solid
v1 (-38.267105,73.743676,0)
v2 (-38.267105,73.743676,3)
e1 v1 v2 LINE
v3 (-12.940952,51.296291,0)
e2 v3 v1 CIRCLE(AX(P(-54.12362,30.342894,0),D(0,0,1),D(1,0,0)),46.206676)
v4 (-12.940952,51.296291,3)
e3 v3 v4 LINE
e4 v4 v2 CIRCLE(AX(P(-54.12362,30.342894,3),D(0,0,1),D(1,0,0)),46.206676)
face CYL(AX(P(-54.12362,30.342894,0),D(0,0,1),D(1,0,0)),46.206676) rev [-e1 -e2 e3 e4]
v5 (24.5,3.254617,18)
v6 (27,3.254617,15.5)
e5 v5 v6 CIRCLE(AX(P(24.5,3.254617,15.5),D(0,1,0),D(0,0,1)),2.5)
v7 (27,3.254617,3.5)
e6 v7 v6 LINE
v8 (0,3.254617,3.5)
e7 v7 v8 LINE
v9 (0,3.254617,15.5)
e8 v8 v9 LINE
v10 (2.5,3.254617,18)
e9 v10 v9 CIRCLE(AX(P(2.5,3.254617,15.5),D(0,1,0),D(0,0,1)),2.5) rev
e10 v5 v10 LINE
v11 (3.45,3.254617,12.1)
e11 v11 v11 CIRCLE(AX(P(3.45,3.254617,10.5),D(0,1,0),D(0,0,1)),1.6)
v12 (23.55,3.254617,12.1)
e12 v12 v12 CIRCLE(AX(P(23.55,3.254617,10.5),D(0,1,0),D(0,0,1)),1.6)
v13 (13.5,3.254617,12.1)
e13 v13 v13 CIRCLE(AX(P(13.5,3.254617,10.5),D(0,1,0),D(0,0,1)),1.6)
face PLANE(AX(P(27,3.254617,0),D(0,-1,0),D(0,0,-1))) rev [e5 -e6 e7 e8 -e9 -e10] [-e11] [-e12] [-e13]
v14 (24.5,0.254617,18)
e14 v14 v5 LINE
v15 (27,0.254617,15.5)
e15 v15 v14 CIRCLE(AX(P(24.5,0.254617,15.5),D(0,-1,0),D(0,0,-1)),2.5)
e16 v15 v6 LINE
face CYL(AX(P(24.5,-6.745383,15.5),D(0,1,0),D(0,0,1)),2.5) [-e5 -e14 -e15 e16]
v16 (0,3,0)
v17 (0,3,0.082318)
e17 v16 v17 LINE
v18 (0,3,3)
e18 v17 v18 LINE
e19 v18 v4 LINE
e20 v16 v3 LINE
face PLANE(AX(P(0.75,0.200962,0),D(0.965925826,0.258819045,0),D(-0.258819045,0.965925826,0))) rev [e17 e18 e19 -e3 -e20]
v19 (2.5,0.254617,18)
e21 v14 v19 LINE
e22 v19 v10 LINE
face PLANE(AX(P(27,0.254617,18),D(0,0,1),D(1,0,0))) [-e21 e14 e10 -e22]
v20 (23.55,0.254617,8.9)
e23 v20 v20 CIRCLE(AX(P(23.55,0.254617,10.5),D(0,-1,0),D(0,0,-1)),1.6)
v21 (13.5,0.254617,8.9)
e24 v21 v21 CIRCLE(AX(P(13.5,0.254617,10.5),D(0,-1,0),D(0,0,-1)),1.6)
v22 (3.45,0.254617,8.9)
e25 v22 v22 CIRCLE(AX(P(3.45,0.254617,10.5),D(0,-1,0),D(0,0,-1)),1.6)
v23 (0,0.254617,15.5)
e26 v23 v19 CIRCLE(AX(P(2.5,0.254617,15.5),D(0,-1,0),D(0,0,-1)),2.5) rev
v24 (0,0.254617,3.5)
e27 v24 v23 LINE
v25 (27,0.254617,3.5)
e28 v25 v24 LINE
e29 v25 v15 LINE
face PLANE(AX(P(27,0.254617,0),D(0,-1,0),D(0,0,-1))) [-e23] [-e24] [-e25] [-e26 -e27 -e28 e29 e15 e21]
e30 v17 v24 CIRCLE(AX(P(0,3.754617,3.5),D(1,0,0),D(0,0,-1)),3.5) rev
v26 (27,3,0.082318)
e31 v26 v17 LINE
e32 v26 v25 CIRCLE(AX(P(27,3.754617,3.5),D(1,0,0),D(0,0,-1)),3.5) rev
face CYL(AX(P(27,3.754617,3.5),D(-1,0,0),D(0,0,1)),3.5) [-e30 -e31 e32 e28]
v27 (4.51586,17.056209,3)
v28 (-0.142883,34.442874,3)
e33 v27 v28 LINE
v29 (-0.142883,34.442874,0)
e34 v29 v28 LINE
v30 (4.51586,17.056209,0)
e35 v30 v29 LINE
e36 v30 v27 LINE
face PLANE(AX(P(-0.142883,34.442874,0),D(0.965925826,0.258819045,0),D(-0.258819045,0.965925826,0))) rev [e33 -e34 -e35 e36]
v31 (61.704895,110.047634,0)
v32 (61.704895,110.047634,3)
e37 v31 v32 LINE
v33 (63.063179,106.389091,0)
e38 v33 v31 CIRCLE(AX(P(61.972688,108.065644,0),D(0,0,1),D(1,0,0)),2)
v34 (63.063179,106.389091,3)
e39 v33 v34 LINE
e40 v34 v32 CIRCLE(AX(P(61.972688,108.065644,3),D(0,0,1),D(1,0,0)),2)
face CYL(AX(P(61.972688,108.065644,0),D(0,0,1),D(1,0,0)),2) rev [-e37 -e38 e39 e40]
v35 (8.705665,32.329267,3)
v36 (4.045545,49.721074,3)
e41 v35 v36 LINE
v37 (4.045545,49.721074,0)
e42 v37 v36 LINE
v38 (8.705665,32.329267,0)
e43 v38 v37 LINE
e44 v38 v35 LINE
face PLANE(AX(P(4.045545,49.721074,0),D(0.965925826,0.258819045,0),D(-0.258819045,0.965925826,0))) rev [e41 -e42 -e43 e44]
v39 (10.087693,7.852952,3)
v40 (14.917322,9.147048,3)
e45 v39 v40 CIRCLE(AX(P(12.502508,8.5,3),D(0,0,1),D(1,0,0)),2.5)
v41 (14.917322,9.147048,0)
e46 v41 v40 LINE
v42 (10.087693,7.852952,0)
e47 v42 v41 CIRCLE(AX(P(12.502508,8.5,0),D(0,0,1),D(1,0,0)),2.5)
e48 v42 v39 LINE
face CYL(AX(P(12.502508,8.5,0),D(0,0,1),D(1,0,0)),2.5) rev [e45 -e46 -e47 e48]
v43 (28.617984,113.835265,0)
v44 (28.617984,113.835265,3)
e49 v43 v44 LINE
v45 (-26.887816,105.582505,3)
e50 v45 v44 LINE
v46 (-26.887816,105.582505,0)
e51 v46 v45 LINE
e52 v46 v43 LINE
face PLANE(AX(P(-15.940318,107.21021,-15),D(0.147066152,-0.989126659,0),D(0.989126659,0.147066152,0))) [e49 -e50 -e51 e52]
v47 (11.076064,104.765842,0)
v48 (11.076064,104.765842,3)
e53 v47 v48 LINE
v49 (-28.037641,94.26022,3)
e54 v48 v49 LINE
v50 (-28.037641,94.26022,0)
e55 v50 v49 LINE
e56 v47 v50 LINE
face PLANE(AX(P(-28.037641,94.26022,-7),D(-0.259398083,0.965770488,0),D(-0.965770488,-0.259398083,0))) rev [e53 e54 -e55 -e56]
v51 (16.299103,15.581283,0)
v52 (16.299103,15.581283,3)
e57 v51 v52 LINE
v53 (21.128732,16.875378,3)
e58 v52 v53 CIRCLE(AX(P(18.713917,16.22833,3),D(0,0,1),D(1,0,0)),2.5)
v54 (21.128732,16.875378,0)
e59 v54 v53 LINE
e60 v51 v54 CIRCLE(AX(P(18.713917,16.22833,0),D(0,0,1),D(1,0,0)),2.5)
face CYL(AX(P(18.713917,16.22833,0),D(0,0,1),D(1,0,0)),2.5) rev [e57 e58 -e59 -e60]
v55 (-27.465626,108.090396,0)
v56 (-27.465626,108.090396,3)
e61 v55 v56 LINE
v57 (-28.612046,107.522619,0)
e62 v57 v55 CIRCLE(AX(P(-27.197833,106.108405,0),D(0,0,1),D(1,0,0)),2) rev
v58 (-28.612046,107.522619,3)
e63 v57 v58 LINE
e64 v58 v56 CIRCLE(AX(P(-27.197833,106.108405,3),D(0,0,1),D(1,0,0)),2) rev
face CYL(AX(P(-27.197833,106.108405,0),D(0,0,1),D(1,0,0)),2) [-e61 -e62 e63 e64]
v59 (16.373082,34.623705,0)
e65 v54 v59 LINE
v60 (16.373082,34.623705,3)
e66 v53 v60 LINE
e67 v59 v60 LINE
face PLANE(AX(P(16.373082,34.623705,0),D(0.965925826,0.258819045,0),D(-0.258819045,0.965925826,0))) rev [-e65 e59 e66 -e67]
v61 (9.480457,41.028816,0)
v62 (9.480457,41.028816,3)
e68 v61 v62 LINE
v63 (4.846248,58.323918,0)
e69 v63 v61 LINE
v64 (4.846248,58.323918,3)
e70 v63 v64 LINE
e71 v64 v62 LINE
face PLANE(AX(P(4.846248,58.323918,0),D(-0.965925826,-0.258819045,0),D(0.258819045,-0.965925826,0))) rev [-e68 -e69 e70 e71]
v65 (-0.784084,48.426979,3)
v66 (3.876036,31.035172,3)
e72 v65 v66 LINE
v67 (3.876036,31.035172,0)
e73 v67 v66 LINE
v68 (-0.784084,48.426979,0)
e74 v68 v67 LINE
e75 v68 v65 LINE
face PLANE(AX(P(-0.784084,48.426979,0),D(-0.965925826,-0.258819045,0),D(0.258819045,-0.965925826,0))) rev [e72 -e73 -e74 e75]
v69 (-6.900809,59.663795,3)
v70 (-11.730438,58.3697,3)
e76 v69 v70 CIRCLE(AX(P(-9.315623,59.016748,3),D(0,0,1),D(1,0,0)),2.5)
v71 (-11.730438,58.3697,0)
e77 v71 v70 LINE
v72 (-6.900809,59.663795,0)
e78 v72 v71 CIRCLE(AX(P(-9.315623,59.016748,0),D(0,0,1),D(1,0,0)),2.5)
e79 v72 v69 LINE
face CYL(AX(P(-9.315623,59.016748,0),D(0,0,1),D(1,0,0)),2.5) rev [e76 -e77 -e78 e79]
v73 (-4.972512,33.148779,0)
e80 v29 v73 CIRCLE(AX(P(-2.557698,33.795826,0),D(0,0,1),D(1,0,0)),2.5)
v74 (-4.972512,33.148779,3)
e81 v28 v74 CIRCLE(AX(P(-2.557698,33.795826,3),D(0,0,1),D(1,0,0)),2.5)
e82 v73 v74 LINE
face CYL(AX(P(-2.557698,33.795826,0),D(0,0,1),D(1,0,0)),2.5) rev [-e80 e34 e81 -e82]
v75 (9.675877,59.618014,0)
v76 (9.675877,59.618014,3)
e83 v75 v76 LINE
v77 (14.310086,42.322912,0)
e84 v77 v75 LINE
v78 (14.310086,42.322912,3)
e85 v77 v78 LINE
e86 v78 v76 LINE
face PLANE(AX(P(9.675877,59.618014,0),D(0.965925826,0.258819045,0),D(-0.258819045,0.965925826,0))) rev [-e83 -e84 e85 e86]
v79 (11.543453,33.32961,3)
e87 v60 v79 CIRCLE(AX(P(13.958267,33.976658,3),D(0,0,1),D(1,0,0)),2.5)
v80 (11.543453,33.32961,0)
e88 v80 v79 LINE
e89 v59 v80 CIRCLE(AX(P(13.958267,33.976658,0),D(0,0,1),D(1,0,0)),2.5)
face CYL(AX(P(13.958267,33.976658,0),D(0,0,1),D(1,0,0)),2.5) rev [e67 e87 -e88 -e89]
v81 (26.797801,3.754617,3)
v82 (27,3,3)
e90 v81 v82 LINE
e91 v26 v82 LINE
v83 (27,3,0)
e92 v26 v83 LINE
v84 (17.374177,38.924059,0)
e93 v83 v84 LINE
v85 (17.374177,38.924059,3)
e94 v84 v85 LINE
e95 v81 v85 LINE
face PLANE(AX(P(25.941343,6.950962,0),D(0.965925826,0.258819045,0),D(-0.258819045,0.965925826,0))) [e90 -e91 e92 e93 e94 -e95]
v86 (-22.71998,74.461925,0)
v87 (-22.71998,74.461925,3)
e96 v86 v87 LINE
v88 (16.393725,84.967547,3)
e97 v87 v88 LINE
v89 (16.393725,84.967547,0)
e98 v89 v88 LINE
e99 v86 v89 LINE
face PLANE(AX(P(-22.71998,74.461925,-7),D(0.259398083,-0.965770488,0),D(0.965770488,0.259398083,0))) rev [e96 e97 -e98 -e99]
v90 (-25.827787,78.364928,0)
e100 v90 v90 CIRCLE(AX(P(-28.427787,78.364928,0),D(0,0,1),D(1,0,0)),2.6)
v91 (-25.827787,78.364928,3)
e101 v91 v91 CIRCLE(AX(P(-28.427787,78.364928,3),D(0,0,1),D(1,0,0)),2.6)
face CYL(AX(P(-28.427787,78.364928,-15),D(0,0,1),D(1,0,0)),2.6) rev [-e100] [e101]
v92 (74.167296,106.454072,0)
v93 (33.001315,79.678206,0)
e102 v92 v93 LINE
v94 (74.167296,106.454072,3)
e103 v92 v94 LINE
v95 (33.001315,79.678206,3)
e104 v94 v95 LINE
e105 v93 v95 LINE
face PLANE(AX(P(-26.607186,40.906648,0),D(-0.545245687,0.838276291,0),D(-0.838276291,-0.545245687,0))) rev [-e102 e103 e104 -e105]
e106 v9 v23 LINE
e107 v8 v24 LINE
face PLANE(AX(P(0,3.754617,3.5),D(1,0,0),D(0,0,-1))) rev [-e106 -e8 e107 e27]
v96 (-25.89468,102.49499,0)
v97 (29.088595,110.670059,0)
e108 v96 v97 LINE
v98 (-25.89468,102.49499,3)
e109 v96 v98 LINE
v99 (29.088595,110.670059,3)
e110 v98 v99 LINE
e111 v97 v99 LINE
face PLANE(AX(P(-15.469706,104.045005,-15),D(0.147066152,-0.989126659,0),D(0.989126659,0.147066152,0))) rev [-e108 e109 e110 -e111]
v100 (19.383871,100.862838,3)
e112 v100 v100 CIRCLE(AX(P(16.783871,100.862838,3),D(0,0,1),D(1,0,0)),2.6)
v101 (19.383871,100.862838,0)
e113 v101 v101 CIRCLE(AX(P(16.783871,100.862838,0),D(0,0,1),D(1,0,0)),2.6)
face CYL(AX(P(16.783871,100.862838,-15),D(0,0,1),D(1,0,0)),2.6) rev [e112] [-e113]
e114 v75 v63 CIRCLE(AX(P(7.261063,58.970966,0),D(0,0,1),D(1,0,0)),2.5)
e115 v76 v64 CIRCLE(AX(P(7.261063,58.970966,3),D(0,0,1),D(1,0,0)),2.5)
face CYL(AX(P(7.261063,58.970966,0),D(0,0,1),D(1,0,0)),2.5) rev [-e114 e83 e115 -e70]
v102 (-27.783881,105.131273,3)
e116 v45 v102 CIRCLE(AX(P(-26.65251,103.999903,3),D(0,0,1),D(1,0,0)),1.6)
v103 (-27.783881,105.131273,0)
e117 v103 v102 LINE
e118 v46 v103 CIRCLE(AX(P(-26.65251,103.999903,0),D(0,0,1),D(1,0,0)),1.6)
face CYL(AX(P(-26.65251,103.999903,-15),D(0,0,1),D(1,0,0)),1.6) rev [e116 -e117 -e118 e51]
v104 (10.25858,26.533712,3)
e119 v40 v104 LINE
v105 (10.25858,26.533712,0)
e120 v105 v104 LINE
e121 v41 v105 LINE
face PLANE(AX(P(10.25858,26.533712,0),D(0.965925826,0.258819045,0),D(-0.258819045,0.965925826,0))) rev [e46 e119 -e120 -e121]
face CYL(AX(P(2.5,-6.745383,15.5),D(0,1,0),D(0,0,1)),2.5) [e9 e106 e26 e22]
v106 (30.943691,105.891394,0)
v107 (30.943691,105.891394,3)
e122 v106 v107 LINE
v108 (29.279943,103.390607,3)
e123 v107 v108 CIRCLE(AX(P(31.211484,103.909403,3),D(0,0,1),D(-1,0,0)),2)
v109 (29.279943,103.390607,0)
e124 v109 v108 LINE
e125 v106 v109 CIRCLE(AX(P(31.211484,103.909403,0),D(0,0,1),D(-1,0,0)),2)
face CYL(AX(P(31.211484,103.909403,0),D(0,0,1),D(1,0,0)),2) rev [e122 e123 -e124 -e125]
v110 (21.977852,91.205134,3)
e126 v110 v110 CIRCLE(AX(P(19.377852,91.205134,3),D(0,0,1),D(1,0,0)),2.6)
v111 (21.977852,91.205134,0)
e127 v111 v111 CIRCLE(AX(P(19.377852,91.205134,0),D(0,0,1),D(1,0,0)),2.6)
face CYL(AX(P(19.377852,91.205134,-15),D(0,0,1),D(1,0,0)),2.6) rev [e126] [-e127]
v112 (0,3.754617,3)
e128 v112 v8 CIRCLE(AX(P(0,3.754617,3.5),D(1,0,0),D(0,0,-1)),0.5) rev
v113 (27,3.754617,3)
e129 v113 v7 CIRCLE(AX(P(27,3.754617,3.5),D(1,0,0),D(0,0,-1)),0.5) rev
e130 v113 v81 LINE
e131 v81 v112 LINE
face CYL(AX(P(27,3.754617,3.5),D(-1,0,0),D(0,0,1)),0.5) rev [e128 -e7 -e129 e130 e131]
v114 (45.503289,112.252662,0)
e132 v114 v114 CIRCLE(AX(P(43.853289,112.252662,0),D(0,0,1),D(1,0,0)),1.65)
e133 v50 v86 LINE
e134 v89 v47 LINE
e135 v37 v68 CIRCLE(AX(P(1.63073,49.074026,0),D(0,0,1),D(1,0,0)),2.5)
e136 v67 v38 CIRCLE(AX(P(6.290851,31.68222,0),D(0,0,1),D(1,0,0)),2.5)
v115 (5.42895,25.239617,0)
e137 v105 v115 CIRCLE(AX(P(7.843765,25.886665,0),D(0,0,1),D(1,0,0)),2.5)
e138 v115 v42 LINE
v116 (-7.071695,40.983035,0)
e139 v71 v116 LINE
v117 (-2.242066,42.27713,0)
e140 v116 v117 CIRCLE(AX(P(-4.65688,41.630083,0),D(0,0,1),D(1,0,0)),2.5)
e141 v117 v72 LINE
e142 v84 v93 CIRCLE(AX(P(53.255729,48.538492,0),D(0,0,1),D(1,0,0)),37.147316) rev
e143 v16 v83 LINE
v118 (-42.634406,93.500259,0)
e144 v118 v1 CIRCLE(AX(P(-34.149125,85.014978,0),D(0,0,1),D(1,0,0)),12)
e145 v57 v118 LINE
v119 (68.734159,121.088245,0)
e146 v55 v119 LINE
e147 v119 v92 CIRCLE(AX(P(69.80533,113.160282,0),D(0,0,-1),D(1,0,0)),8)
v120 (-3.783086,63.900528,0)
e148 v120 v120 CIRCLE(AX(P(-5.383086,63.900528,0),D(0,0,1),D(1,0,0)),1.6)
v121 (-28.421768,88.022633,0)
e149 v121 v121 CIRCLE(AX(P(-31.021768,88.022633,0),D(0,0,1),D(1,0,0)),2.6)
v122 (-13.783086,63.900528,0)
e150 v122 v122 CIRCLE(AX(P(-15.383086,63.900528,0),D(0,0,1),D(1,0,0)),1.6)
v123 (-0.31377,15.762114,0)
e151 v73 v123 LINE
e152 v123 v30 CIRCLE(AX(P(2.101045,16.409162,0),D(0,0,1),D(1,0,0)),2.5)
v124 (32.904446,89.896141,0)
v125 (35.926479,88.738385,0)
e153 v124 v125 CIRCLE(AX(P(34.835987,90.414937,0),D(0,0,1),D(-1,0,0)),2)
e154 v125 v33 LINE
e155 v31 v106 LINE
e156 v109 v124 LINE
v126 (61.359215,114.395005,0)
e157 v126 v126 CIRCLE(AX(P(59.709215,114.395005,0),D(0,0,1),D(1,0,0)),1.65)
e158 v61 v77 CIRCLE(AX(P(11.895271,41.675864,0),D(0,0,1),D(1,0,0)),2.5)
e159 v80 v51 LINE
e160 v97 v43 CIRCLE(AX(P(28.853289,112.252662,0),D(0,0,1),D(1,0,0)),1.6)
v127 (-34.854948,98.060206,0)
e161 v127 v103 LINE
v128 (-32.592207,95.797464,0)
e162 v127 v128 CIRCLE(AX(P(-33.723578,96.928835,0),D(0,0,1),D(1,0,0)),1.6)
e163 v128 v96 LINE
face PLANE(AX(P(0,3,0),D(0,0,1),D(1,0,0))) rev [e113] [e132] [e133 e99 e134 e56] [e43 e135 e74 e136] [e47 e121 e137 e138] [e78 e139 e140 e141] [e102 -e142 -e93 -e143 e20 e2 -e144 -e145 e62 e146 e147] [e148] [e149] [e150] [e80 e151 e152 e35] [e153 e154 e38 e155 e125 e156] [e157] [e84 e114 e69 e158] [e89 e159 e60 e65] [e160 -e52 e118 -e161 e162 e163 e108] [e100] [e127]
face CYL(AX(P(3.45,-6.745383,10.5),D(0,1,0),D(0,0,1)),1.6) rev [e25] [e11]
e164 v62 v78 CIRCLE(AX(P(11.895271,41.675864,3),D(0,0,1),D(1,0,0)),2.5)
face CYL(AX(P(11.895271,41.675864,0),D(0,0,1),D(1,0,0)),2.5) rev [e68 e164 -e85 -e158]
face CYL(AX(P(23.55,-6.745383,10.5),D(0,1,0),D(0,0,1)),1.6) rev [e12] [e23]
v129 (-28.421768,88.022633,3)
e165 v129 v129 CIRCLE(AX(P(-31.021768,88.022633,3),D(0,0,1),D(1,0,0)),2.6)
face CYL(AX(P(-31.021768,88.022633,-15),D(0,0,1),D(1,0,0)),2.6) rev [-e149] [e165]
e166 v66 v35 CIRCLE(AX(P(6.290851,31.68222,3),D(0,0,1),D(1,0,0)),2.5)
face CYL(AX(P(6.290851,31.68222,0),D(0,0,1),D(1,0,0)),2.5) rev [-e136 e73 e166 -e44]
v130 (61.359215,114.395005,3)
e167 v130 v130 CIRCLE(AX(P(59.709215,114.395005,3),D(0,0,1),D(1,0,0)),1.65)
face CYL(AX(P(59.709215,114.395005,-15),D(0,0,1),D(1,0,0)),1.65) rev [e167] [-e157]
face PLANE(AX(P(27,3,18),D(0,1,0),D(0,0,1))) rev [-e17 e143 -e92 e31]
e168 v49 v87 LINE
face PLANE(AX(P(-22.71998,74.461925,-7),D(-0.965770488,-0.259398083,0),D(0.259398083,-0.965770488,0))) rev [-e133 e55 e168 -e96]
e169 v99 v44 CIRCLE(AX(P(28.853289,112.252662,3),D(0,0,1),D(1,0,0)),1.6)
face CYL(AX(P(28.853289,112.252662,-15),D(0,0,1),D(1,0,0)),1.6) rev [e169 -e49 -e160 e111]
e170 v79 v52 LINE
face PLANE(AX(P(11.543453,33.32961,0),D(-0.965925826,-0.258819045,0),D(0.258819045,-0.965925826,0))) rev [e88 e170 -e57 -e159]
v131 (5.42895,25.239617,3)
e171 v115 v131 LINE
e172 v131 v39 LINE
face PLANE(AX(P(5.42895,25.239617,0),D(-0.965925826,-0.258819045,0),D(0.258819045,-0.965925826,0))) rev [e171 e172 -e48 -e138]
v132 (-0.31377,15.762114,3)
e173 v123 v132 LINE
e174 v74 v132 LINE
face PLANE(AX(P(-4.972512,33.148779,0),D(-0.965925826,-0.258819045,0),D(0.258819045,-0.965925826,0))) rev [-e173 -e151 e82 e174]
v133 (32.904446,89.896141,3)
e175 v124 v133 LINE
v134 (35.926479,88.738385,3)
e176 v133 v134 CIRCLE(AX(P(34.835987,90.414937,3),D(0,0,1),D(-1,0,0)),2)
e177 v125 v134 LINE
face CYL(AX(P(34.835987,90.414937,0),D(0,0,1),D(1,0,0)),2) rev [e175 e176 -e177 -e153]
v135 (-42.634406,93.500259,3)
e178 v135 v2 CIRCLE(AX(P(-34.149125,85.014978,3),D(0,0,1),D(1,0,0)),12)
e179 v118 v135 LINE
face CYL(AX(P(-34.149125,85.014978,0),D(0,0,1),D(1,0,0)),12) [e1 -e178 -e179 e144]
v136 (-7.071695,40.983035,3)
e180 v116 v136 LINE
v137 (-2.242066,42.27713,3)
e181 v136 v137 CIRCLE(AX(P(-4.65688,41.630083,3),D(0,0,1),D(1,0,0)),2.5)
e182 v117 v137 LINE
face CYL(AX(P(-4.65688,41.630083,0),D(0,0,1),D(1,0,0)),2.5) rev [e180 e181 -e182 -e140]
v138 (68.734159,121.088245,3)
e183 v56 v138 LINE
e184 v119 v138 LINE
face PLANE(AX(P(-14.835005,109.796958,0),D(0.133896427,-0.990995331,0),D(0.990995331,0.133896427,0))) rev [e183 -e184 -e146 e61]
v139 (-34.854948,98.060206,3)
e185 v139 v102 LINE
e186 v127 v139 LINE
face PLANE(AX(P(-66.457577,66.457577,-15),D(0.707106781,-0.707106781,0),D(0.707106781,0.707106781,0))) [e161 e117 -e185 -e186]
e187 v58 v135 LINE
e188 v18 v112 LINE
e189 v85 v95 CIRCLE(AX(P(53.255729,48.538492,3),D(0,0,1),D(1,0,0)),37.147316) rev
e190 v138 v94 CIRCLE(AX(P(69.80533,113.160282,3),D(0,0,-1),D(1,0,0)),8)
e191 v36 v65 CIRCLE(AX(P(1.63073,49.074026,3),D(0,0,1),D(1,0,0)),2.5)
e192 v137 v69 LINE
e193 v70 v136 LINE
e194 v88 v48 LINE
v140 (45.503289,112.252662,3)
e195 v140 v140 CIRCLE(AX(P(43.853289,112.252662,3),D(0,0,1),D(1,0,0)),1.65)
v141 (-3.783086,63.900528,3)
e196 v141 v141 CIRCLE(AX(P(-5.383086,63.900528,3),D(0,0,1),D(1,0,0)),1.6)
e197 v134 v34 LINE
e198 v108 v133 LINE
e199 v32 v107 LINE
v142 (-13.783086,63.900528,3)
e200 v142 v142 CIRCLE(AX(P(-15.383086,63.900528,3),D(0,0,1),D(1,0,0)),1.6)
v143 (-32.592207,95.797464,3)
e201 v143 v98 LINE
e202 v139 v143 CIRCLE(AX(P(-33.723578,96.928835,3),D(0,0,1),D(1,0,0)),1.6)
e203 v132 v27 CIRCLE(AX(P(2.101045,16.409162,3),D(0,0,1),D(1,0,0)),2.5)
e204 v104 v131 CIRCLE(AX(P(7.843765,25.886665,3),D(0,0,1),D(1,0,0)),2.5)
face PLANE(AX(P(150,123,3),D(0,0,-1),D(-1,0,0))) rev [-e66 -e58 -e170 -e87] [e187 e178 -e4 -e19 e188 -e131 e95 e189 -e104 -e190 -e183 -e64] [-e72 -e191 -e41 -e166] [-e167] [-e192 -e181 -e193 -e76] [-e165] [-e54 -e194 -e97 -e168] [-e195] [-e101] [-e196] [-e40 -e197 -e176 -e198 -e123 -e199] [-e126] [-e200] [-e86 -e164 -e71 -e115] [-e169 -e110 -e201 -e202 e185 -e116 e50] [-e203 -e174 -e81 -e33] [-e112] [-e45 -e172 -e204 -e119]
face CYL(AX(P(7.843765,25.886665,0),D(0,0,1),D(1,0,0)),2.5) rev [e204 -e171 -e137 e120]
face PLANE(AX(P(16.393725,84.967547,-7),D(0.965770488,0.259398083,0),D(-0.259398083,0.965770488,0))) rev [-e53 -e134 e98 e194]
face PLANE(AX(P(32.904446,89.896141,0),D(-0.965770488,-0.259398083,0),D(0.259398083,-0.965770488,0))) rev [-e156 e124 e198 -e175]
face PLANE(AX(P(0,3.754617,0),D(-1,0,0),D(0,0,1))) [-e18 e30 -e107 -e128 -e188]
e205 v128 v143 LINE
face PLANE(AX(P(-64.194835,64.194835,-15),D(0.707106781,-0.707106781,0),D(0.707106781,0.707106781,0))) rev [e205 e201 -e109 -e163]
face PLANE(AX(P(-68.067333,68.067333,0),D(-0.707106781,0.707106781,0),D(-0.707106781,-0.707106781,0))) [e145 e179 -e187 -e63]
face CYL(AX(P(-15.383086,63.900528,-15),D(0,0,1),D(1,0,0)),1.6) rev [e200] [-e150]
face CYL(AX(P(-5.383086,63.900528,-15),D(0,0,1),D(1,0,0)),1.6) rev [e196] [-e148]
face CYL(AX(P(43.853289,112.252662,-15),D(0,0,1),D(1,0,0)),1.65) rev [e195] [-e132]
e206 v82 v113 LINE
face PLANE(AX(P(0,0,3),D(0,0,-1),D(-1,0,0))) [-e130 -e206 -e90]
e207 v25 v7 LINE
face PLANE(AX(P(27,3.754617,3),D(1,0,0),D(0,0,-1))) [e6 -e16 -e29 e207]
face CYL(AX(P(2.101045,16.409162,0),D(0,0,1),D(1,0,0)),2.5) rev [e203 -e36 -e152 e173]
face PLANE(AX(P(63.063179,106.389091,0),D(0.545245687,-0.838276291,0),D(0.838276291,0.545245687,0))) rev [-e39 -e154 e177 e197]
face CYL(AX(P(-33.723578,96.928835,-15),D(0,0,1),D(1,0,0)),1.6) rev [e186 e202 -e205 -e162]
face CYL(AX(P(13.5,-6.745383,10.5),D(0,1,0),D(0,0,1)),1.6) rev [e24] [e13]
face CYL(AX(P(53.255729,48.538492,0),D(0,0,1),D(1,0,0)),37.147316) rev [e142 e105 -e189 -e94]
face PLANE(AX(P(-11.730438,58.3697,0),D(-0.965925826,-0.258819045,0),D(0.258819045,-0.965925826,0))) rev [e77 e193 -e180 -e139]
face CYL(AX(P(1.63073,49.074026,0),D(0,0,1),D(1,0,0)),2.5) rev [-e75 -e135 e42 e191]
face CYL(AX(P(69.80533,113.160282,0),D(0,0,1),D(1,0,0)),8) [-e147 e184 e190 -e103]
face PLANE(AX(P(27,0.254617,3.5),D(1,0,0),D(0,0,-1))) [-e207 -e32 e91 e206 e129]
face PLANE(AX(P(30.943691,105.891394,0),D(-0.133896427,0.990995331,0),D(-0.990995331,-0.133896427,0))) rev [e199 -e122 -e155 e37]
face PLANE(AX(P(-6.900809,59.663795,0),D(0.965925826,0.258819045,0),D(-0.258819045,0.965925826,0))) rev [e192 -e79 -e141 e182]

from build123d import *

# Parameters (mm, degrees)
EXTRUDE_1_DEPTH              = 3
EXTRUDE_2_DEPTH              = 120
CUT_EXTRUDE_1_DEPTH          = 195.561044405
CUT_EXTRUDE_2_DEPTH          = 152.697989965
SKETCH_9_R                   = 0.555167329
CUT_EXTRUDE_3_DEPTH          = 10
HOLE_WIZARD_M5_1_D           = 4.2
HOLE_WIZARD_M5_1_DEPTH       = 12.4
HOLE_WIZARD_M5_1_CSINK_D     = 5.05
HOLE_WIZARD_M5_1_CSINK_ANGLE = 90
HOLE_WIZARD_M5_1_TIP         = 1.2618073
SKETCH_12_R                  = 0.419228838
SKETCH_12_R_2                = 0.457437139
CUT_EXTRUDE_4_DEPTH          = 10
HOLE_WIZARD_M3_1_D           = 2.5
HOLE_WIZARD_M3_1_DEPTH       = 7.5
HOLE_WIZARD_M3_1_CSINK_D     = 3.05
HOLE_WIZARD_M3_1_CSINK_ANGLE = 90
HOLE_WIZARD_M3_1_TIP         = 0.751075774
SKETCH_31_W                  = 27
SKETCH_31_H                  = 3
CUT_EXTRUDE_7_DEPTH          = 18
SM_BASE_FLANGE_4_DEPTH       = 27
CUT_EXTRUDE_8_DEPTH          = 18
SKETCH_42_R                  = 1.6
SKETCH_42_R_2                = 2.6
CUT_EXTRUDE_9_DEPTH          = 18
SKETCH_43_R                  = 1.65
CUT_EXTRUDE_10_DEPTH         = 18
CUT_EXTRUDE_11_DEPTH         = 10
CUT_EXTRUDE_12_DEPTH         = 152.697989965
CUT_EXTRUDE_13_DEPTH         = 152.697989965


# Sheet-metal steps are written as plain solids
with BuildPart() as part:
    # 草图2 → 凸台-拉伸1 (new body)
    with BuildSketch(Plane(origin=(0, 0, 0), x_dir=(1, 0, 0), z_dir=(0, 1, 0))):
        with BuildLine():
            Line((0, 0), (27, 0))
            Line((27, 0), (27, -16))
            ThreePointArc((27, -16), (26.414213562, -17.414213562), (25, -18))
            Line((25, -18), (2, -18))
            ThreePointArc((2, -18), (0.585786438, -17.414213562), (0, -16))
            Line((0, -16), (0, 0))
        make_face()
    extrude(amount=EXTRUDE_1_DEPTH)

    # 草图3 → 凸台-拉伸2 (add)
    with BuildSketch(Plane(origin=(0, 3, 0), x_dir=(1, 0, 0), z_dir=(0, 1, 0))):
        Polygon((0, 0), (150, 0), (150, -3), (-100, -3), (-100, 0), align=None)
    extrude(amount=EXTRUDE_2_DEPTH)

    # 草图4 → 切除-拉伸1 (cut, through all)
    with BuildSketch(Plane.XY.offset(3)):
        with BuildLine():
            Line((-27.465625599, 108.090395999), (81.955038276, 122.874558425))
            ThreePointArc((81.955038276, 122.874558425), (87.311898998, 119.659835192), (85.350748847, 113.728200311))
            Line((85.350748847, 113.728200311), (33.001315422, 79.678206183))
            ThreePointArc((33.001315422, 79.678206183), (18.570908538, 61.838352676), (17.374177378, 38.924059091))
            Line((17.374177378, 38.924059091), (27, 3))
            Line((27, 3), (150, 3))
            Line((150, 3), (150, 123))
            Line((150, 123), (-100, 123))
            Line((-100, 123), (-100, 3))
            Line((-100, 3), (0, 3))
            Line((0, 3), (-12.940952255, 51.296291314))
            ThreePointArc((-12.940952255, 51.296291314), (-23.474992402, 64.922058411), (-38.267104772, 73.743676313))
            ThreePointArc((-38.267104772, 73.743676313), (-45.866257029, 82.424841396), (-42.634405947, 93.500259258))
            Line((-42.634405947, 93.500259258), (-28.612046307, 107.522618899))
            ThreePointArc((-28.612046307, 107.522618899), (-28.085458288, 107.900644409), (-27.465625599, 108.090395999))
        make_face()
    extrude(amount=-CUT_EXTRUDE_1_DEPTH, mode=Mode.SUBTRACT)

    # Sketch 8 → 切除-拉伸2 (cut, through all)
    with BuildSketch(Plane.XY.offset(3)):
        with BuildLine():
            Line((11.543452853, 33.329610255), (16.299102923, 15.581282572))
            ThreePointArc((16.299102923, 15.581282572), (19.360965101, 13.813515619), (21.128732054, 16.875377797))
            Line((21.128732054, 16.875377797), (16.373081985, 34.623705481))
            ThreePointArc((16.373081985, 34.623705481), (13.311219806, 36.391472434), (11.543452853, 33.329610255))
        make_face()
        with BuildLine():
            Line((-11.73043783, 58.369699894), (-7.071695019, 40.983035021))
            ThreePointArc((-7.071695019, 40.983035021), (-4.00983284, 39.215268068), (-2.242065887, 42.277130246))
            Line((-2.242065887, 42.277130246), (-6.900808699, 59.663795119))
            ThreePointArc((-6.900808699, 59.663795119), (-9.962670878, 61.431562072), (-11.73043783, 58.369699894))
        make_face()
        with BuildLine():
            Line((-4.972512404, 33.14877885), (-0.313769593, 15.762113977))
            ThreePointArc((-0.313769593, 15.762113977), (2.748092586, 13.994347024), (4.515859539, 17.056209202))
            Line((4.515859539, 17.056209202), (-0.142883273, 34.442874076))
            ThreePointArc((-0.142883273, 34.442874076), (-3.204745451, 36.210641028), (-4.972512404, 33.14877885))
        make_face()
        with BuildLine():
            Line((-0.784084289, 48.426978761), (3.876036229, 31.035172218))
            ThreePointArc((3.876036229, 31.035172218), (6.937898407, 29.267405265), (8.70566536, 32.329267444))
            Line((8.70566536, 32.329267444), (4.045544842, 49.721073986))
            ThreePointArc((4.045544842, 49.721073986), (0.983682664, 51.488840939), (-0.784084289, 48.426978761))
        make_face()
        with BuildLine():
            Line((4.846248155, 58.323918457), (9.480456769, 41.028816457))
            ThreePointArc((9.480456769, 41.028816457), (12.542318947, 39.261049504), (14.3100859, 42.322911683))
            Line((14.3100859, 42.322911683), (9.675877286, 59.618013683))
            ThreePointArc((9.675877286, 59.618013683), (6.614015108, 61.385780636), (4.846248155, 58.323918457))
        make_face()
        with BuildLine():
            Line((5.4289505, 25.23961726), (10.087693311, 7.852952387))
            ThreePointArc((10.087693311, 7.852952387), (13.14955549, 6.085185434), (14.917322443, 9.147047613))
            Line((14.917322443, 9.147047613), (10.258579631, 26.533712486))
            ThreePointArc((10.258579631, 26.533712486), (7.196717453, 28.301479439), (5.4289505, 25.23961726))
        make_face()
    extrude(amount=-CUT_EXTRUDE_2_DEPTH, mode=Mode.SUBTRACT)

    # 草图9 → 切除-拉伸3 (cut)
    with BuildSketch(Plane.XY.offset(3)):
        with Locations((-28.427787155, 78.364928444)):
            Circle(SKETCH_9_R)
        with Locations((-31.021767983, 88.02263332)):
            Circle(SKETCH_9_R)
        with Locations((19.37785198, 91.205133539)):
            Circle(SKETCH_9_R)
        with Locations((16.783871152, 100.862838415)):
            Circle(SKETCH_9_R)
        Polygon((-22.719980027, 74.461924756), (-28.037640723, 94.260219752), (11.076064024, 104.765842103), (16.39372472, 84.967547107), align=None)
    extrude(amount=-CUT_EXTRUDE_3_DEPTH, mode=Mode.SUBTRACT)

    # M5 螺纹孔1
    with Locations(Plane.XY.offset(3)):
        with Locations((-31.021767983, 88.02263332), (-28.427787155, 78.364928444), (16.783871152, 100.862838415), (19.37785198, 91.205133539)):
            CounterSinkHole(HOLE_WIZARD_M5_1_D / 2, HOLE_WIZARD_M5_1_CSINK_D / 2, depth=HOLE_WIZARD_M5_1_DEPTH, counter_sink_angle=HOLE_WIZARD_M5_1_CSINK_ANGLE)
            with Locations((0, 0, -(HOLE_WIZARD_M5_1_DEPTH + HOLE_WIZARD_M5_1_TIP / 2))):  # 118° drill point
                Cone(0, HOLE_WIZARD_M5_1_D / 2, HOLE_WIZARD_M5_1_TIP, mode=Mode.SUBTRACT)

    # 草图12 → 切除-拉伸4 (cut)
    with BuildSketch(Plane.XY.offset(3)):
        with Locations((-5.383085829, 63.900528175)):
            Circle(SKETCH_12_R)
        with Locations((-15.383085829, 63.900528175)):
            Circle(SKETCH_12_R_2)
        Polygon((-27.731348581, 94.083626651), (10.899470923, 104.45954996), (16.087432577, 85.144140208), (-22.543386926, 74.768216899), align=None)
    extrude(amount=-CUT_EXTRUDE_4_DEPTH, mode=Mode.SUBTRACT)

    # M3 螺纹孔1
    with Locations(Plane.XY.offset(3)):
        with Locations((-15.383085829, 63.900528175), (-5.383085829, 63.900528175)):
            CounterSinkHole(HOLE_WIZARD_M3_1_D / 2, HOLE_WIZARD_M3_1_CSINK_D / 2, depth=HOLE_WIZARD_M3_1_DEPTH, counter_sink_angle=HOLE_WIZARD_M3_1_CSINK_ANGLE)
            with Locations((0, 0, -(HOLE_WIZARD_M3_1_DEPTH + HOLE_WIZARD_M3_1_TIP / 2))):  # 118° drill point
                Cone(0, HOLE_WIZARD_M3_1_D / 2, HOLE_WIZARD_M3_1_TIP, mode=Mode.SUBTRACT)

    # 草图31 → 切除-拉伸7 (cut)
    with BuildSketch(Plane(origin=(0, 0, 0), x_dir=(-1, 0, 0), z_dir=(0, 0, -1))):
        with Locations((-13.5, 1.5)):
            Rectangle(SKETCH_31_W, SKETCH_31_H)
    extrude(amount=-CUT_EXTRUDE_7_DEPTH, mode=Mode.SUBTRACT)

    # 草图42 → 切除-拉伸9 (cut)
    with BuildSketch(Plane.XY.offset(3)):
        with Locations((-15.383085829, 63.900528175)):
            Circle(SKETCH_42_R)
        with Locations((-5.383085829, 63.900528175)):
            Circle(SKETCH_42_R)
        with Locations((-28.427787155, 78.364928444)):
            Circle(SKETCH_42_R_2)
        with Locations((-31.021767983, 88.02263332)):
            Circle(SKETCH_42_R_2)
        with Locations((16.783871152, 100.862838415)):
            Circle(SKETCH_42_R_2)
        with Locations((19.37785198, 91.205133539)):
            Circle(SKETCH_42_R_2)
    extrude(amount=-CUT_EXTRUDE_9_DEPTH, mode=Mode.SUBTRACT)

    # 草图43 → 切除-拉伸10 (cut)
    with BuildSketch(Plane.XY.offset(3)):
        with Locations((43.853289388, 112.252662001)):
            Circle(SKETCH_43_R)
        with Locations((59.70921469, 114.395004835)):
            Circle(SKETCH_43_R)
        with BuildLine():
            Line((-34.854948443, 98.060205677), (-27.783880632, 105.131273489))
            ThreePointArc((-27.783880632, 105.131273489), (-27.372130398, 105.428939436), (-26.887815625, 105.582505293))
            Line((-26.887815625, 105.582505293), (28.617983545, 113.835264655))
            ThreePointArc((28.617983545, 113.835264655), (30.435892042, 112.487967844), (29.088595231, 110.670059347))
            Line((29.088595231, 110.670059347), (-25.894680467, 102.494990254))
            Line((-25.894680467, 102.494990254), (-32.592206744, 95.797463977))
            ThreePointArc((-32.592206744, 95.797463977), (-34.854948443, 95.797463977), (-34.854948443, 98.060205677))
        make_face()
    extrude(amount=-CUT_EXTRUDE_10_DEPTH, mode=Mode.SUBTRACT)

    # 草图45 → 切除-拉伸12 (cut, through all)
    with BuildSketch(Plane.XY.offset(3)):
        with BuildLine():
            Line((30.943691051, 105.891393518), (61.704894996, 110.047634391))
            ThreePointArc((61.704894996, 110.047634391), (63.847639285, 108.761745098), (63.063179225, 106.389091146))
            Line((63.063179225, 106.389091146), (35.926478804, 88.738384548))
            ThreePointArc((35.926478804, 88.738384548), (34.120486844, 88.547302554), (32.904446455, 89.896140965))
            Line((32.904446455, 89.896140965), (29.27994293, 103.39060669))
            ThreePointArc((29.27994293, 103.39060669), (29.546325951, 105.017215559), (30.943691051, 105.891393518))
        make_face()
    extrude(amount=-CUT_EXTRUDE_12_DEPTH, mode=Mode.SUBTRACT)

    # 草图46 → 切除-拉伸13 (cut, through all)
    with BuildSketch(Plane.XY.offset(3)):
        with BuildLine():
            Line((85.350748847, 113.728200311), (74.167295897, 106.45407178))
            ThreePointArc((74.167295897, 106.45407178), (77.30513614, 115.944687589), (68.734158983, 121.088244762))
            Line((68.734158983, 121.088244762), (81.955038276, 122.874558425))
            ThreePointArc((81.955038276, 122.874558425), (87.311898998, 119.659835192), (85.350748847, 113.728200311))
        make_face()
    extrude(amount=-CUT_EXTRUDE_13_DEPTH, mode=Mode.SUBTRACT)


with BuildPart() as body_2:
    # 草图32 → 基体-法兰4 (new body)
    with BuildSketch(Plane(origin=(0, 0, 0), x_dir=(0, 0, -1), z_dir=(1, 0, 0))):
        with BuildLine():
            Line((0, 4.254616755), (0, 3.754616755))
            ThreePointArc((0, 3.754616755), (-1.025126266, 1.279743021), (-3.5, 0.254616755))
            Line((-3.5, 0.254616755), (-18, 0.254616755))
            Line((-18, 0.254616755), (-18, 3.254616755))
            Line((-18, 3.254616755), (-3.5, 3.254616755))
            ThreePointArc((-3.5, 3.254616755), (-3.146446609, 3.401063365), (-3, 3.754616755))
            Line((-3, 3.754616755), (-3, 4.254616755))
            Line((-3, 4.254616755), (0, 4.254616755))
        make_face()
    extrude(amount=SM_BASE_FLANGE_4_DEPTH)

    # 草图41 → 切除-拉伸8 (cut)
    with BuildSketch(Plane.XY.offset(3)):
        Polygon((27, 3), (27, 4.254616755), (26.663826454, 4.254616755), align=None)
    extrude(amount=-CUT_EXTRUDE_8_DEPTH, mode=Mode.SUBTRACT)

    # 草图44 → 切除-拉伸11 (cut)
    with BuildSketch(Plane(origin=(0, 3.254616755, 0), x_dir=(1, 0, 0), z_dir=(0, 1, 0))):
        with BuildLine():
            ThreePointArc((5.05, -10.5), (3.45, -8.9), (1.85, -10.5))
            Line((1.85, -10.5), (5.05, -10.5))
        make_face()
        with BuildLine():
            Line((5.05, -10.5), (1.85, -10.5))
            ThreePointArc((1.85, -10.5), (3.45, -12.1), (5.05, -10.5))
        make_face()
        with BuildLine():
            Line((0, -15.5), (0, -18))
            Line((0, -18), (2.5, -18))
            ThreePointArc((2.5, -18), (0.732233047, -17.267766953), (0, -15.5))
        make_face()
        with BuildLine():
            ThreePointArc((21.95, -10.5), (23.55, -12.1), (25.15, -10.5))
            Line((25.15, -10.5), (21.95, -10.5))
        make_face()
        with BuildLine():
            Line((21.95, -10.5), (25.15, -10.5))
            ThreePointArc((25.15, -10.5), (23.55, -8.9), (21.95, -10.5))
        make_face()
        with BuildLine():
            ThreePointArc((15.1, -10.5), (13.5, -8.9), (11.9, -10.5))
            Line((11.9, -10.5), (15.1, -10.5))
        make_face()
        with BuildLine():
            Line((15.1, -10.5), (11.9, -10.5))
            ThreePointArc((11.9, -10.5), (13.5, -12.1), (15.1, -10.5))
        make_face()
        with BuildLine():
            ThreePointArc((27, -15.5), (26.267766953, -17.267766953), (24.5, -18))
            Line((24.5, -18), (27, -18))
            Line((27, -18), (27, -15.5))
        make_face()
    extrude(amount=-CUT_EXTRUDE_11_DEPTH, mode=Mode.SUBTRACT)


with BuildPart() as part_1:
    add(part.part)

    # Combine 1: union body 2
    add(body_2.part)


solid = part_1.part
